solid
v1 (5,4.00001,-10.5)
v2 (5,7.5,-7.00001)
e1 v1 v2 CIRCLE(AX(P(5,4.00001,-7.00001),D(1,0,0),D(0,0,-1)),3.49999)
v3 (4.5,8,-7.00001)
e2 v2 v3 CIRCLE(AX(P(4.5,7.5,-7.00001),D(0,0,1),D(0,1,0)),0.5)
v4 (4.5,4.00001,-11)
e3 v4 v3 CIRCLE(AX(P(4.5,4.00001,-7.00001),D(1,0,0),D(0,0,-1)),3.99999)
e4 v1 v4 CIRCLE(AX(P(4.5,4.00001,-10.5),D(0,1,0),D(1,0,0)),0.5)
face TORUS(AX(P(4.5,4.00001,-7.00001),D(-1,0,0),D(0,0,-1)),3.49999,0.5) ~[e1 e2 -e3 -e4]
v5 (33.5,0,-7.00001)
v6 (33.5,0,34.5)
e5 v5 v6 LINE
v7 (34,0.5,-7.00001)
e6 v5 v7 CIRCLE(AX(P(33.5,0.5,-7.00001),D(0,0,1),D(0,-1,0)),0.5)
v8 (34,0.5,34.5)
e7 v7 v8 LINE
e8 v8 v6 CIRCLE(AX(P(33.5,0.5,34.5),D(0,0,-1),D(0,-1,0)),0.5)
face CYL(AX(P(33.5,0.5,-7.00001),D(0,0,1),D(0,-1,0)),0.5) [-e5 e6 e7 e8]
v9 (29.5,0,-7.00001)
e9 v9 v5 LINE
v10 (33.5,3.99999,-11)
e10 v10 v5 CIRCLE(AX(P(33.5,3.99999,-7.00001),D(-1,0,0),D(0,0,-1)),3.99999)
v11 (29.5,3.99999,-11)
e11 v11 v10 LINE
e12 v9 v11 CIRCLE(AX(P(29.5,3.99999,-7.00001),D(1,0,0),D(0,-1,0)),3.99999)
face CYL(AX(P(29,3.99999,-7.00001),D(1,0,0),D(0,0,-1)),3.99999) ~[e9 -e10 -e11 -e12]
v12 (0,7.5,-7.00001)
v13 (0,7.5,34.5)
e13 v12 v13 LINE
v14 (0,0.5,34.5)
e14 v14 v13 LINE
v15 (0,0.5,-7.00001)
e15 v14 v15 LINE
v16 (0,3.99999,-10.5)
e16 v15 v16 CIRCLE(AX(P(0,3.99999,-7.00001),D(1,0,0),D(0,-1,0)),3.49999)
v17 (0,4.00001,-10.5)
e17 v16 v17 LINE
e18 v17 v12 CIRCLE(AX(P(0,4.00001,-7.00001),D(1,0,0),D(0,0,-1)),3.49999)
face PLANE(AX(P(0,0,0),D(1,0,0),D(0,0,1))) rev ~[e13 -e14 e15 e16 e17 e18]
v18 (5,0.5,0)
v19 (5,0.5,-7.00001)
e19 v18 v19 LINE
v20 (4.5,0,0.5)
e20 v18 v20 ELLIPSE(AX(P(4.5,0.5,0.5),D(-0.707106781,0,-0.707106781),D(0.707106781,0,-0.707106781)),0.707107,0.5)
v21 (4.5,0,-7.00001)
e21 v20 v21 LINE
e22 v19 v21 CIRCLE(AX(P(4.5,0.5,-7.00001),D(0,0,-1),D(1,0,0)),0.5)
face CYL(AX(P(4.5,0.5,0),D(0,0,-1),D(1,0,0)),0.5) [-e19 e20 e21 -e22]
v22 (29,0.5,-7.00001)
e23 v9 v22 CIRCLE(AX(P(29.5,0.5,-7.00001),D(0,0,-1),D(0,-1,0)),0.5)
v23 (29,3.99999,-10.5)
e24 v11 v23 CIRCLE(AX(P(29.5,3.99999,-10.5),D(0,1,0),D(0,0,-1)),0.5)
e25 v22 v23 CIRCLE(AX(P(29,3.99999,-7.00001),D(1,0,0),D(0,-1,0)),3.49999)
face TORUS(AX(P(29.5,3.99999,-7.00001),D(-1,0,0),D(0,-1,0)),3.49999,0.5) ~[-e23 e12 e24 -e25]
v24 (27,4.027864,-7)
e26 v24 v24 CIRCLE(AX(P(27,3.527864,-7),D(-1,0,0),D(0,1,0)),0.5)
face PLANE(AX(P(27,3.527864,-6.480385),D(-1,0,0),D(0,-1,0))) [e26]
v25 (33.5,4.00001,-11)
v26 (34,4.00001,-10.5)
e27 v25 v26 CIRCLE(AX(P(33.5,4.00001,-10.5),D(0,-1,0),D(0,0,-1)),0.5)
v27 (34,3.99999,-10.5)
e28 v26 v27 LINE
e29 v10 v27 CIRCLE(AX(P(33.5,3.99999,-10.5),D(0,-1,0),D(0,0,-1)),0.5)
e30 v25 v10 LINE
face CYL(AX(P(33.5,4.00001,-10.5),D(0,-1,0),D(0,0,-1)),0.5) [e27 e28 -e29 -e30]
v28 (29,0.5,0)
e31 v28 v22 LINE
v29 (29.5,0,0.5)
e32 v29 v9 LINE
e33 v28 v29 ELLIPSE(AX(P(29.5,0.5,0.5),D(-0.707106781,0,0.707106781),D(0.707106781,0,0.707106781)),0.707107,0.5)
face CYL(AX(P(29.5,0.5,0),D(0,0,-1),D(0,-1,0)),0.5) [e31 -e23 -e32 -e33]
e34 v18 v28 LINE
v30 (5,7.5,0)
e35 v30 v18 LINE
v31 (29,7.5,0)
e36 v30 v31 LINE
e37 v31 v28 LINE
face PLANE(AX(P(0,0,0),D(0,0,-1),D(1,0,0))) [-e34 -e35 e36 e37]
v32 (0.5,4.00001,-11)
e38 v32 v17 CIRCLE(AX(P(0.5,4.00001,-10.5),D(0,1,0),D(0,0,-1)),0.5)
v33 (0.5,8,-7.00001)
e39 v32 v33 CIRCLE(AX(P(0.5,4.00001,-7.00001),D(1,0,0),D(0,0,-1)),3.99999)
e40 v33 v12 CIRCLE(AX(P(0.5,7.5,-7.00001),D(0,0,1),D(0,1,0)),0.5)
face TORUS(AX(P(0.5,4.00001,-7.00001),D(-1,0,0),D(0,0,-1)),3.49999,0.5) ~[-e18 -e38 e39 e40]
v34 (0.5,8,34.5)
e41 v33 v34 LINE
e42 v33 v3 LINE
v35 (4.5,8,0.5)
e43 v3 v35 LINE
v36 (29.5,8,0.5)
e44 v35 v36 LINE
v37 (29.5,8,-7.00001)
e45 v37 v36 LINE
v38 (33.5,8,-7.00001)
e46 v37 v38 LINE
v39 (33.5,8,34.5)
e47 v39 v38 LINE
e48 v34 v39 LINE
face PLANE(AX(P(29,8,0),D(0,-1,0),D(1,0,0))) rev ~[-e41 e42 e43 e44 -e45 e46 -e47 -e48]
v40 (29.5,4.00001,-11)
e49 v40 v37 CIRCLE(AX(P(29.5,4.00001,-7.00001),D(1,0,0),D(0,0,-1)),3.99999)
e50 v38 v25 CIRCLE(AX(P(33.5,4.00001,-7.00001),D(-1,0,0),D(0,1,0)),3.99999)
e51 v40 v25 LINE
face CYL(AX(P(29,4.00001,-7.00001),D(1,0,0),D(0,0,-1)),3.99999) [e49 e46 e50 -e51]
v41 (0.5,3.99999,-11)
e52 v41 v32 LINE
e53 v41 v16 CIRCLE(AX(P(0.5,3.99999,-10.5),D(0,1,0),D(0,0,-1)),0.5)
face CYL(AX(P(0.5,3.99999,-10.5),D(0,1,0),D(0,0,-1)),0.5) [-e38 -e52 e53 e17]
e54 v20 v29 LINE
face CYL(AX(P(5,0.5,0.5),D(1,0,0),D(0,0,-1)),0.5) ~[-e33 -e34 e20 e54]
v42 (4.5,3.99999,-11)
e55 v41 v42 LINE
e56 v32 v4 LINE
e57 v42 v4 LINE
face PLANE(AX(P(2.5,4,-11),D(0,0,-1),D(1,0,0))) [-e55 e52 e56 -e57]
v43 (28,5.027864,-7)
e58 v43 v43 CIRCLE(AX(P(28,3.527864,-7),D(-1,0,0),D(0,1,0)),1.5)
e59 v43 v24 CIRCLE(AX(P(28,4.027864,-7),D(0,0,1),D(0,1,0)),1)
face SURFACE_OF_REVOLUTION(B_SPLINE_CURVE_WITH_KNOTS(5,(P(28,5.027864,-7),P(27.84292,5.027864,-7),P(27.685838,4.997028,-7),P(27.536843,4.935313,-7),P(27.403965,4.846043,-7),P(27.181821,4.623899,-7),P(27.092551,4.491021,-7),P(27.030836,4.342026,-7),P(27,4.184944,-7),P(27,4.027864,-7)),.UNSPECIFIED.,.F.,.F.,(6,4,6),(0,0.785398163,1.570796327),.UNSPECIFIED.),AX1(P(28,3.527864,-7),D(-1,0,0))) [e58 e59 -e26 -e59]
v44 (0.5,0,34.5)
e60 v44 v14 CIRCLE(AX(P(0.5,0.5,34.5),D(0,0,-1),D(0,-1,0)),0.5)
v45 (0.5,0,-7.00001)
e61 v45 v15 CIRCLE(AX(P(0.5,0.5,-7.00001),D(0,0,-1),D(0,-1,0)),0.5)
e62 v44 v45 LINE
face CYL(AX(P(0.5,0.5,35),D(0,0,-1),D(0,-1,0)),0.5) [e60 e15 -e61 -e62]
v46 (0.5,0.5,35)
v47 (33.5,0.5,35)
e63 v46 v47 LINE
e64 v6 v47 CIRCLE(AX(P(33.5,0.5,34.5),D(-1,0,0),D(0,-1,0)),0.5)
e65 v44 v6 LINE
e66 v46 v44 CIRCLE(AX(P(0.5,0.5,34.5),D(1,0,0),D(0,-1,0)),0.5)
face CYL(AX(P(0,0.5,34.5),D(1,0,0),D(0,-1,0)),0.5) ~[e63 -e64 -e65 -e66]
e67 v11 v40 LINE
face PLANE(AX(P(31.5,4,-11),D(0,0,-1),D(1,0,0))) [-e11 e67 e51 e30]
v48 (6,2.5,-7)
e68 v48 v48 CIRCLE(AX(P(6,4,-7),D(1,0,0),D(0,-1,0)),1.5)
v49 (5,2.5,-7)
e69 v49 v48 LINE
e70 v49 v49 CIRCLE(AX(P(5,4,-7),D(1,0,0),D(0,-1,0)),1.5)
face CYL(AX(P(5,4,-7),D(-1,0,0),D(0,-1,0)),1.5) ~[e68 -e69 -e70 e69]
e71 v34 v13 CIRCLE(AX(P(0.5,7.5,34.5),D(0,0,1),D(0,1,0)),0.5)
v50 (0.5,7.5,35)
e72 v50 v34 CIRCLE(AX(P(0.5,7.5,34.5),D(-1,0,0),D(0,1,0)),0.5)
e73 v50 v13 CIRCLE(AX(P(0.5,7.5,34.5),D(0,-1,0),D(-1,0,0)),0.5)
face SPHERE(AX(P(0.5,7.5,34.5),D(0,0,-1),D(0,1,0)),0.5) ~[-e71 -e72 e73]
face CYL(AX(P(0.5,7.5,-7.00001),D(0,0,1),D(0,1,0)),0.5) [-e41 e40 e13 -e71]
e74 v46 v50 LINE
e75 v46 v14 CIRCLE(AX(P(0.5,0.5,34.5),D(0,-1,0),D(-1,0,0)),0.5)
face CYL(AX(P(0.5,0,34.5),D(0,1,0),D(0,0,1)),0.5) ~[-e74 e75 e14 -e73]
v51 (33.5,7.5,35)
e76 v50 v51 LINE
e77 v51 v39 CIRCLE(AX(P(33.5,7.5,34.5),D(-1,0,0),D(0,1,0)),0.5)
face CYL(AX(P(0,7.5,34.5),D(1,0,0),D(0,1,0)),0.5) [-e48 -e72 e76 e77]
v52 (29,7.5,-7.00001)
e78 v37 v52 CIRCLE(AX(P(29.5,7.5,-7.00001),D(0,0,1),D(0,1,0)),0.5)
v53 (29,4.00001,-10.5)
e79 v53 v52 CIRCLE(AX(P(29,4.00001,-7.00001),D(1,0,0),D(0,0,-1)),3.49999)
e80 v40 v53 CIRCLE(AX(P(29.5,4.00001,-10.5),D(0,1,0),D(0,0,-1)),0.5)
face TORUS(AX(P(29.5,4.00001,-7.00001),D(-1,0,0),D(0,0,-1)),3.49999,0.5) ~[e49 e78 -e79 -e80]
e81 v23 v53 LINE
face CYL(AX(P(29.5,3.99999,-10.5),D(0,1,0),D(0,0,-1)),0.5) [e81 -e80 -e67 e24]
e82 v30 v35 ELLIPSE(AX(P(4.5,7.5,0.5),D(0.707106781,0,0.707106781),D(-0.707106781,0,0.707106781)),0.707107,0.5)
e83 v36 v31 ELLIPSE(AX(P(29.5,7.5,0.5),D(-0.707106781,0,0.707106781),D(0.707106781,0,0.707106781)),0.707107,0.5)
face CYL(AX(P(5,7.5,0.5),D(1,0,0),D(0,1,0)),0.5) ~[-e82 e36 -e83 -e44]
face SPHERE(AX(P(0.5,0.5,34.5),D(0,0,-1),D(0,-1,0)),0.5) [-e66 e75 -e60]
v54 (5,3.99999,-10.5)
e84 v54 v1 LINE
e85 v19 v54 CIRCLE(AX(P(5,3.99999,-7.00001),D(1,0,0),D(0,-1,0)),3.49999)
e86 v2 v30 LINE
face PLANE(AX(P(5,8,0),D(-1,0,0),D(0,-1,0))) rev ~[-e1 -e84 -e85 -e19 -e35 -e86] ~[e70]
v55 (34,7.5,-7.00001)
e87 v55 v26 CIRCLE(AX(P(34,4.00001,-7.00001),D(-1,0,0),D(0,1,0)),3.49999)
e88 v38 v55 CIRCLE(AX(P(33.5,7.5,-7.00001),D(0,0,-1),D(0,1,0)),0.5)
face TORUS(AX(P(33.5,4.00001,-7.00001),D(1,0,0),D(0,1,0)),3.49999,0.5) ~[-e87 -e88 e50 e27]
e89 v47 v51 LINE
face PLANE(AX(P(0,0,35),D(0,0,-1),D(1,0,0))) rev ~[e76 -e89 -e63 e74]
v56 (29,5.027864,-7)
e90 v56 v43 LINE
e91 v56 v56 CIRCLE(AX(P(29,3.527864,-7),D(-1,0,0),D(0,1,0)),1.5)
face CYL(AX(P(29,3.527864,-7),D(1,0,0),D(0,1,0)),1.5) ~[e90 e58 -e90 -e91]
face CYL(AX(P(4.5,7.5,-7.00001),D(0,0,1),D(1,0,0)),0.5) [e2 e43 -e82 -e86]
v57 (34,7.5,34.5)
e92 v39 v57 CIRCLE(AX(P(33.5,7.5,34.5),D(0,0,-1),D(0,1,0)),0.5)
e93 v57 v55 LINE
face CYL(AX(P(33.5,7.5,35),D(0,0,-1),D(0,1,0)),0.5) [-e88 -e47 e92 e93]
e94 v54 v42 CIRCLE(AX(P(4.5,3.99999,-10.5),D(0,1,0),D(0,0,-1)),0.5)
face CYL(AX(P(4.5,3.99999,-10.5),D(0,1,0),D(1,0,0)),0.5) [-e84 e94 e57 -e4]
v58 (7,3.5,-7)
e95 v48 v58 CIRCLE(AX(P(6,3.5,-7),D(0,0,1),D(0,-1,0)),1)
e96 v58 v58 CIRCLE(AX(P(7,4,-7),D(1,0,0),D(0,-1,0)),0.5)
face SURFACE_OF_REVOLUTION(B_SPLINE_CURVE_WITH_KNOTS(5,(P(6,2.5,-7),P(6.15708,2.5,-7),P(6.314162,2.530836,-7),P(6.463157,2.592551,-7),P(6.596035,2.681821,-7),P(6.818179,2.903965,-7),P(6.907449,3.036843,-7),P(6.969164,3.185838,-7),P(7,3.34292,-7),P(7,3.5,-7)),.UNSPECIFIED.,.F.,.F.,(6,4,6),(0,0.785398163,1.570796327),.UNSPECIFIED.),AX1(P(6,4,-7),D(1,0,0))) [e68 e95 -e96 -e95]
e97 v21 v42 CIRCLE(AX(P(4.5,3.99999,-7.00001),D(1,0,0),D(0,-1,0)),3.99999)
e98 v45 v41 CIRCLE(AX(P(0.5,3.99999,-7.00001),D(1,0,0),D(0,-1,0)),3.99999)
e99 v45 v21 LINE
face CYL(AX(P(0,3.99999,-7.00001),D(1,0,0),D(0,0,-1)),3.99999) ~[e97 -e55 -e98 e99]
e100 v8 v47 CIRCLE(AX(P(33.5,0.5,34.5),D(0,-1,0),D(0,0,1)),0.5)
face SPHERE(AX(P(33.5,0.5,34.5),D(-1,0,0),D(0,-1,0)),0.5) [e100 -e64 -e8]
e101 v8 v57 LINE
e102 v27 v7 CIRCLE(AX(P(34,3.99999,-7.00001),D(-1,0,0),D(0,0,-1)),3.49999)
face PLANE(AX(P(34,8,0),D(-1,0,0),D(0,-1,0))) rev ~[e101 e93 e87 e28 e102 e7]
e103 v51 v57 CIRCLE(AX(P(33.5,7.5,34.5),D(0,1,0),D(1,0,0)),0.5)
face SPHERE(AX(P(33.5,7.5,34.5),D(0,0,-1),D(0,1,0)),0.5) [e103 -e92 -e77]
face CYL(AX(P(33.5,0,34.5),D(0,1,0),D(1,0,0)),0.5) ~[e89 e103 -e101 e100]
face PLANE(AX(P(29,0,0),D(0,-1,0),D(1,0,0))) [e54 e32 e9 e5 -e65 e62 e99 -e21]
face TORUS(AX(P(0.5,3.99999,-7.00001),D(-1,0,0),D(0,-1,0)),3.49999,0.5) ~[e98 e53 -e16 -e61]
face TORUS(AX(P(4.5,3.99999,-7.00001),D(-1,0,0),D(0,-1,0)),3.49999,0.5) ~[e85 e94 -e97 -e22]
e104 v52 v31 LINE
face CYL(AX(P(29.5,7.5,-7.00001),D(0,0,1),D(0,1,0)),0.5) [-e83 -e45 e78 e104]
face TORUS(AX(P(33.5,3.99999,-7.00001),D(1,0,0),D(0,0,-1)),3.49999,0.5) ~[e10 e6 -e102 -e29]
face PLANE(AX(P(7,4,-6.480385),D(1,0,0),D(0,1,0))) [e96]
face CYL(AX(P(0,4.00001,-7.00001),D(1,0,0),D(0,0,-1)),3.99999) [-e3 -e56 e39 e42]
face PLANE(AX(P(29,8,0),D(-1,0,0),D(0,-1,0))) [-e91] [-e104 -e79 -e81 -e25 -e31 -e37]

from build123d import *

# Parameters (mm, degrees)
F0_W     = 34
F0_H     = 35
F1_DEPTH = 8
F2_W     = 5
F2_H     = 8
F3_DEPTH = 11
F4_R     = 3.99999
F6_DEPTH = 2
F7_R     = 1
F9_DEPTH = 2
F10_R    = 1
F11_R    = 0.5


# Not quite as in the source:
# - a fillet or chamfer is up to 0.001 mm smaller than in the source, because OpenCascade refuses the exact size


with BuildPart() as f1:
    # F0 (on Front) → F1 (new body)
    with BuildSketch(Plane.XZ):
        with Locations((17, 17.5)):
            Rectangle(F0_W, F0_H)
    extrude(amount=-F1_DEPTH)

    # F2 (on face) → F3 (join)
    with BuildSketch(Plane(origin=(0, 0, 0), x_dir=(1, 0, 0), z_dir=(0, 0, -1))):
        with Locations((31.5, -4)):
            Rectangle(F2_W, F2_H)
        with Locations((2.5, -4)):
            Rectangle(F2_W, F2_H)
    extrude(amount=F3_DEPTH)

    # F4 (radius 4 in the source; OpenCascade refuses exactly that, so slightly less here)
    f4_edges = [f1.edges().sort_by_distance(p)[0] for p in [
        (2.5, 0, -11),
        (2.5, 8, -11),
        (31.5, 8, -11),
        (31.5, 0, -11),
    ]]
    fillet(f4_edges, radius=F4_R)

    # F5 (on face) → F6 (join)
    with BuildSketch(Plane(origin=(29, 0, 0), x_dir=(0, -1, 0), z_dir=(-1, 0, 0))):
        with BuildLine():
            Line((-5.027864045, -7), (-2.027864045, -7))
            ThreePointArc((-2.027864045, -7), (-3.527864045, -5.5), (-5.027864045, -7))
        make_face()
        with BuildLine():
            ThreePointArc((-5.027864045, -7), (-3.527864045, -8.5), (-2.027864045, -7))
            Line((-2.027864045, -7), (-5.027864045, -7))
        make_face()
    extrude(amount=F6_DEPTH)

    # F7
    f7_edges = [f1.edges().sort_by_distance(p)[0] for p in [
        (27, 2.027864, -7),
    ]]
    fillet(f7_edges, radius=F7_R)

    # F8 (on face) → F9 (join)
    with BuildSketch(Plane.YZ.offset(5)):
        with BuildLine():
            Line((2.5, -7), (5.5, -7))
            ThreePointArc((5.5, -7), (4, -5.5), (2.5, -7))
        make_face()
        with BuildLine():
            ThreePointArc((2.5, -7), (4, -8.5), (5.5, -7))
            Line((5.5, -7), (2.5, -7))
        make_face()
    extrude(amount=F9_DEPTH)

    # F10
    f10_edges = [f1.edges().sort_by_distance(p)[0] for p in [
        (7, 5.5, -7),
    ]]
    fillet(f10_edges, radius=F10_R)

    # F11
    f11_edges = [f1.edges().sort_by_distance(p)[0] for p in [
        (0, 0, 13.999995),
        (2.5, 0, -7.00001),
        (17, 0, 35),
        (5, 0, -3.500005),
        (34, 0, 13.999995),
        (17, 0, 0),
        (31.5, 0, -7.00001),
        (29, 0, -3.500005),
        (0, 8, 13.999995),
        (2.5, 8, -7.00001),
        (17, 8, 35),
        (5, 8, -3.500005),
        (34, 8, 13.999995),
        (17, 8, 0),
        (31.5, 8, -7.00001),
        (29, 8, -3.500005),
        (34, 4, 35),
        (0, 4, 35),
    ]]
    fillet(f11_edges, radius=F11_R)


solid = f1.part
